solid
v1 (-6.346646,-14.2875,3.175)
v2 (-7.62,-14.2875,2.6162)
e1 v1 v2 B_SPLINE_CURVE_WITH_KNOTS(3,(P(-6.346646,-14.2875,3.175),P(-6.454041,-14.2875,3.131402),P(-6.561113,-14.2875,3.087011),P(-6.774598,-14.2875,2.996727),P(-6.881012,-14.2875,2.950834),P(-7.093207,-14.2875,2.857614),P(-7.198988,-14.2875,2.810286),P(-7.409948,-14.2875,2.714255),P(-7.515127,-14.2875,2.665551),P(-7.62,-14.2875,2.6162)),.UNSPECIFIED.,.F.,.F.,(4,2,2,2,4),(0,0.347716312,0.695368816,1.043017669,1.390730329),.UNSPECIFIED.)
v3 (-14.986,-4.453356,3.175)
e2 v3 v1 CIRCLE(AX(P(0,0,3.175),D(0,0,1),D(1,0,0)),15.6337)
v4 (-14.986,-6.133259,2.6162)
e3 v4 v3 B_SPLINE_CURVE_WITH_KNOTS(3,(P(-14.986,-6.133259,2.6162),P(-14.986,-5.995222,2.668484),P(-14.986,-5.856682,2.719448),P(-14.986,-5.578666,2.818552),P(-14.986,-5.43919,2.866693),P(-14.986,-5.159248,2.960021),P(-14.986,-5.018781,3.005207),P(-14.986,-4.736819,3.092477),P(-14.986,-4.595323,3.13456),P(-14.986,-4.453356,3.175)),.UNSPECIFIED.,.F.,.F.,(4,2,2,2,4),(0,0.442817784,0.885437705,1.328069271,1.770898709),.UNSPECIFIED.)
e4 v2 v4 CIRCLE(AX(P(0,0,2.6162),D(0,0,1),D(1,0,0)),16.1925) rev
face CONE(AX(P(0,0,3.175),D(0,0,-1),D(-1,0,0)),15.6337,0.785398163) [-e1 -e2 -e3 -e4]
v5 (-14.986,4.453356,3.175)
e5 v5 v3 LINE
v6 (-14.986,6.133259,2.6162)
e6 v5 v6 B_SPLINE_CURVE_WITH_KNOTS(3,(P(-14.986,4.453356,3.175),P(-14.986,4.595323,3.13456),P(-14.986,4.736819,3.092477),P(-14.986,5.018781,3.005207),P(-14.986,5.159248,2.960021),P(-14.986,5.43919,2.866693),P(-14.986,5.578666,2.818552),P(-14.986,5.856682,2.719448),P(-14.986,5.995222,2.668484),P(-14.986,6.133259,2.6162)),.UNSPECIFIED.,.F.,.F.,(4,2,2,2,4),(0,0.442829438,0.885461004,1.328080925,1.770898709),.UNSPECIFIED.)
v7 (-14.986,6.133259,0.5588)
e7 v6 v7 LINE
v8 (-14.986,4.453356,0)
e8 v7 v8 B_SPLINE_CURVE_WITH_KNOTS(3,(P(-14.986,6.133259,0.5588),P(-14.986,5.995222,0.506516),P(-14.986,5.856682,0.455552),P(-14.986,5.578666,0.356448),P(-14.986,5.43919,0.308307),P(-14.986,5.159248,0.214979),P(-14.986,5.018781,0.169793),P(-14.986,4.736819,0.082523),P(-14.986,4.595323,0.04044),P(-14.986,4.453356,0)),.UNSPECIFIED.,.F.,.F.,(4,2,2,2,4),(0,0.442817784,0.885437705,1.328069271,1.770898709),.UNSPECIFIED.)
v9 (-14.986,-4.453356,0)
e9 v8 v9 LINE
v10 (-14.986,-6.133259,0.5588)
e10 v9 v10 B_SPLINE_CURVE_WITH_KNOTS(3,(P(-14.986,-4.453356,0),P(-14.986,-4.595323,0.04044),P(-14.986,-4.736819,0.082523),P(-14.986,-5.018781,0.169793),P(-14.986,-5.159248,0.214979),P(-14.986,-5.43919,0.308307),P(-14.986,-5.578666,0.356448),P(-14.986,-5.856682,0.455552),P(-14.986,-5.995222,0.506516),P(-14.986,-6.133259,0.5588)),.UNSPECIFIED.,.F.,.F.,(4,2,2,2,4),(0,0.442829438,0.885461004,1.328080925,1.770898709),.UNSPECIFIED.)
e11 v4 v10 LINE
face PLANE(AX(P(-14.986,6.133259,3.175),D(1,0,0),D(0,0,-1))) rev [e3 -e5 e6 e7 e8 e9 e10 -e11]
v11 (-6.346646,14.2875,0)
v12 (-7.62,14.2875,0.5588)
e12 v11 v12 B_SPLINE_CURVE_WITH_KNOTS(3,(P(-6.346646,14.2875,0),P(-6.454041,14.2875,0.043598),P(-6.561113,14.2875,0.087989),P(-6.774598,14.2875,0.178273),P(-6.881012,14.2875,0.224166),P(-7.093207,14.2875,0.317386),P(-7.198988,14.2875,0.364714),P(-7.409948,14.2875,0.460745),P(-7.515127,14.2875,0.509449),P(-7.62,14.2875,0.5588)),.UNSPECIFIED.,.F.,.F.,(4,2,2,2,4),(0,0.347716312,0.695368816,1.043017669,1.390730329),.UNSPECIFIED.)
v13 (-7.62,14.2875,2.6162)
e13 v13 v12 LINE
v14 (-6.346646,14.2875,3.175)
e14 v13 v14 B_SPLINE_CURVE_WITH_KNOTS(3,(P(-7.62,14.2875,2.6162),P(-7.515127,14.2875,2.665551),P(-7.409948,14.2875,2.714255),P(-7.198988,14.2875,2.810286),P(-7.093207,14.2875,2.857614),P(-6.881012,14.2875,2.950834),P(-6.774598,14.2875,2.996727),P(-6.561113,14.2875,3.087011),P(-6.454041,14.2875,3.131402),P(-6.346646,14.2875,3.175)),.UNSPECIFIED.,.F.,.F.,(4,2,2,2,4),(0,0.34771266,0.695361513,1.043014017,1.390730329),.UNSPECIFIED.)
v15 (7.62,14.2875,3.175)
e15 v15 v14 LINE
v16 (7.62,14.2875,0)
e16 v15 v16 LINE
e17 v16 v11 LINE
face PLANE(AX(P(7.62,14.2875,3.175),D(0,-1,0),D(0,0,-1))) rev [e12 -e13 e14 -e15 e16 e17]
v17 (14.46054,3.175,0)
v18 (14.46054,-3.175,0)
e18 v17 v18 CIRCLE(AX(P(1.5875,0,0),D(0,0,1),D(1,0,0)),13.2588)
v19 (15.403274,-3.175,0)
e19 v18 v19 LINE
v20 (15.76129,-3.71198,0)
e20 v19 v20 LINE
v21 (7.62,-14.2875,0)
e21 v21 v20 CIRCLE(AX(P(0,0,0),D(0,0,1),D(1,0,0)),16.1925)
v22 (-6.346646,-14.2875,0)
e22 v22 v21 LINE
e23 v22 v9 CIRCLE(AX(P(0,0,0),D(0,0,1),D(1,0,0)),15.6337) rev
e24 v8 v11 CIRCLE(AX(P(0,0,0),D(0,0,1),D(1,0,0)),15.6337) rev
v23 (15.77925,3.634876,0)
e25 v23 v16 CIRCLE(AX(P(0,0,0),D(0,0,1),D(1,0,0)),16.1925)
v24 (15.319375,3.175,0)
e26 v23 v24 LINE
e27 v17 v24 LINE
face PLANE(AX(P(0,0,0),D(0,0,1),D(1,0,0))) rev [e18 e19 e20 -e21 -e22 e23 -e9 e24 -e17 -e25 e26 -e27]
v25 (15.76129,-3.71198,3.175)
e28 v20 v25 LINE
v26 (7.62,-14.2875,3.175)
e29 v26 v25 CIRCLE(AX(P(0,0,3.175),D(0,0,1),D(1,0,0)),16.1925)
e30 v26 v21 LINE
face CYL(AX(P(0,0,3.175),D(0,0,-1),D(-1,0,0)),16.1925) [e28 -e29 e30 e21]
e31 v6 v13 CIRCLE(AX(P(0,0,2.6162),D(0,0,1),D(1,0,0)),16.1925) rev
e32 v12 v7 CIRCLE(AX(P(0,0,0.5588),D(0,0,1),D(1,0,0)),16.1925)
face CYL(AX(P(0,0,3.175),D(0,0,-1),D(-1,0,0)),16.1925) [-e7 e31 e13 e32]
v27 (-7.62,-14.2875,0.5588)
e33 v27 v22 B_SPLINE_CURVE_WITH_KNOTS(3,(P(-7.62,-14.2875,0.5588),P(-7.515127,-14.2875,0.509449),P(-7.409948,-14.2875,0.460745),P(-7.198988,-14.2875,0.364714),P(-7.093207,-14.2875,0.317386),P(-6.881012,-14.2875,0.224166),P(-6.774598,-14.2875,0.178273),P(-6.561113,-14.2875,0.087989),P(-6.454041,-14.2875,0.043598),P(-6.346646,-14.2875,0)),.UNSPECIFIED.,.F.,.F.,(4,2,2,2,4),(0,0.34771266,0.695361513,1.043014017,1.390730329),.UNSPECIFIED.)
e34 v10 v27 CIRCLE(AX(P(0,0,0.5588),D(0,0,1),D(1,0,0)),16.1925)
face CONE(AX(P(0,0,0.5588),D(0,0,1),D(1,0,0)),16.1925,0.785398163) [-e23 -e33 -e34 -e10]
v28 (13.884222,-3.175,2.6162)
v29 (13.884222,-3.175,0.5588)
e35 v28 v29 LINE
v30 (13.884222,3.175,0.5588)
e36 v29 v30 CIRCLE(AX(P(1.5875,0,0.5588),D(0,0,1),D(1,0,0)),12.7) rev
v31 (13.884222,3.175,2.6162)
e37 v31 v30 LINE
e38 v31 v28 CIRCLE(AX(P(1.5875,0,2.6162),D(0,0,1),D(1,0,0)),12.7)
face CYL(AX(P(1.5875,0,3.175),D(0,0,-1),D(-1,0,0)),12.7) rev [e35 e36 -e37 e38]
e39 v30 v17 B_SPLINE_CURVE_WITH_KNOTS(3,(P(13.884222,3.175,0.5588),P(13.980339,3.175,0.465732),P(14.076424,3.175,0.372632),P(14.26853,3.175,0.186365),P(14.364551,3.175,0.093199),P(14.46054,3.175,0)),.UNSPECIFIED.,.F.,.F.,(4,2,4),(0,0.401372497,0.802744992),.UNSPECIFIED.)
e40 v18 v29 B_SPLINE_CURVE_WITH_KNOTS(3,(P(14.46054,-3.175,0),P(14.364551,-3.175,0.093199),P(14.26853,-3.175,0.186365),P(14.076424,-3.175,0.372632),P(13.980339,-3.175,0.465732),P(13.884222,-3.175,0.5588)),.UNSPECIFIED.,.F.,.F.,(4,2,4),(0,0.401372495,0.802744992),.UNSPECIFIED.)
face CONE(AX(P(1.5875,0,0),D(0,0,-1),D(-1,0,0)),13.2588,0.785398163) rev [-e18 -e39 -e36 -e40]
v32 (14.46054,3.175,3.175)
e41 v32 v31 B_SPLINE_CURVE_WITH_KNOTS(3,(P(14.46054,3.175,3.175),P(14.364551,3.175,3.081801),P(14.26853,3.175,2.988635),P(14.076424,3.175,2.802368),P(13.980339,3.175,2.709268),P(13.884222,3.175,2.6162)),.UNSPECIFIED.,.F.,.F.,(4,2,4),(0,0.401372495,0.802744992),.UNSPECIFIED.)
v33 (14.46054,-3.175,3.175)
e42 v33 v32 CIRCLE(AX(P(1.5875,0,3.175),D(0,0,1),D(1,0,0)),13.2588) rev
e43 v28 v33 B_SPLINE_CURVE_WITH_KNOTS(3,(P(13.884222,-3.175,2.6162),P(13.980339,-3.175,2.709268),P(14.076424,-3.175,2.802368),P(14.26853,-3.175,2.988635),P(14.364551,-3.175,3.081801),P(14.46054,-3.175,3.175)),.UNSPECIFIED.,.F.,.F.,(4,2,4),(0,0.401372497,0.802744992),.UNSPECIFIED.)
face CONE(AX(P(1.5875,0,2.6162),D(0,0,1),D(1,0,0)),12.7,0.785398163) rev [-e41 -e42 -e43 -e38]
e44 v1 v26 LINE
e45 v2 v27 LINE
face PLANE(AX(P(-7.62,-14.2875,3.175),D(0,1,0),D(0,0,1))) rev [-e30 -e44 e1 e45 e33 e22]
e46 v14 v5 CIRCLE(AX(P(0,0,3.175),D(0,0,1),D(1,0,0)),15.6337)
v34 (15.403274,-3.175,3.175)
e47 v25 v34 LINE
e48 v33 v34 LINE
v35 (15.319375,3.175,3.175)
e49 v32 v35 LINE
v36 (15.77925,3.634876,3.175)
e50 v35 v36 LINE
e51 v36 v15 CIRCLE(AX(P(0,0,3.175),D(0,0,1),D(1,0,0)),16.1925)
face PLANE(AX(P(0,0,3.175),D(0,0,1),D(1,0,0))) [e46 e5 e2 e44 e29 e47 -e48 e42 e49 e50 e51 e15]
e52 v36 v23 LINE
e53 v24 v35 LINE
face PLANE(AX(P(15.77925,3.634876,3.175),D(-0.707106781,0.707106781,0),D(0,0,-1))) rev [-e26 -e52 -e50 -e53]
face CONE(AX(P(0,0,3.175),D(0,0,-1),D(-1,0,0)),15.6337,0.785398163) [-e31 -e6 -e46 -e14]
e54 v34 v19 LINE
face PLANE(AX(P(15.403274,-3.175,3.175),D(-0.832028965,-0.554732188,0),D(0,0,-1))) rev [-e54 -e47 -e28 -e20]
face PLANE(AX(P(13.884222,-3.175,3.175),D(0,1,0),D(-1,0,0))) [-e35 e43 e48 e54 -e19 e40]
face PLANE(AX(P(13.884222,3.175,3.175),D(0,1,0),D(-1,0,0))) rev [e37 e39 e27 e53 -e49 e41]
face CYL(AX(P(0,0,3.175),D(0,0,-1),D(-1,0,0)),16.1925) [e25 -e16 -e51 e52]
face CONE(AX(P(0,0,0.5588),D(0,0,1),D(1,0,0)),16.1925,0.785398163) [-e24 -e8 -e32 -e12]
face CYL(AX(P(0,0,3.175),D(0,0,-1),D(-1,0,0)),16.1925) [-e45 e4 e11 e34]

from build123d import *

# Parameters (mm, degrees)
BOSS_EXTRUDE1_DEPTH = 3.175
CHAMFER1_SIZE       = 0.5588
CHAMFER2_SIZE       = 0.5588
CHAMFER2_SIZE_2     = 0.474900858


with BuildPart() as part:
    # Sketch1 → Boss-Extrude1 (new body)
    with BuildSketch(Plane.XY):
        with BuildLine():
            Line((13.884222124, 3.175), (15.878174683, 3.175))
            ThreePointArc((15.878174683, 3.175), (12.996652162, 9.65836885), (7.62, 14.2875))
            Line((7.62, 14.2875), (-7.62, 14.2875))
            ThreePointArc((-7.62, 14.2875), (-12.015852965, 10.854323276), (-14.986, 6.133258534))
            Line((-14.986, 6.133258534), (-14.986, -6.133258534))
            ThreePointArc((-14.986, -6.133258534), (-12.015852965, -10.854323276), (-7.62, -14.2875))
            Line((-7.62, -14.2875), (7.62, -14.2875))
            ThreePointArc((7.62, -14.2875), (12.996652162, -9.65836885), (15.878174683, -3.175))
            Line((15.878174683, -3.175), (13.884222124, -3.175))
            ThreePointArc((13.884222124, -3.175), (-11.1125, 0), (13.884222124, 3.175))
        make_face()
    extrude(amount=BOSS_EXTRUDE1_DEPTH)

    # Chamfer1
    chamfer1_edges = [part.edges().sort_by_distance(p)[0] for p in [
        (-11.1125, 0, 0),
        (-12.015852965, -10.854323276, 0),
        (-12.015852965, 10.854323276, 0),
        (-12.015852965, -10.854323276, 3.175),
        (-11.1125, 0, 3.175),
        (-12.015852965, 10.854323276, 3.175),
    ]]
    chamfer(chamfer1_edges, length=CHAMFER1_SIZE)

    # Chamfer2
    # the kernel refuses this chamfer: 0.5588, 0.474900858 mm, written as the material it takes off along each edge
    with BuildSketch(Plane(origin=(15.878174683, 3.175, -1.437056454), x_dir=(-1, 0, 0), z_dir=(0, 0, 1))) as chamfer2_piece_1:
        with BuildLine():
            Line((CHAMFER2_SIZE, 0), (0.098924499, -0.459875501))
            ThreePointArc((0.098924499, -0.459875501), (0.04906799, -0.236222299), (0, 0))
            Line((0, 0), (CHAMFER2_SIZE, 0))
        make_face()
    extrude(amount=6.049112907, mode=Mode.SUBTRACT)
    with BuildSketch(Plane(origin=(15.878174683, -3.175, -1.413292003), x_dir=(-1, 0, 0), z_dir=(0, 0, 1))) as chamfer2_piece_2:
        with BuildLine():
            Line((CHAMFER2_SIZE_2, 0), (0.116884641, 0.536979589))
            ThreePointArc((0.116884641, 0.536979589), (0.057817387, 0.276572291), (0, 0))
            Line((0, 0), (CHAMFER2_SIZE_2, 0))
        make_face()
    extrude(amount=6.001584006, mode=Mode.SUBTRACT)


solid = part.part
